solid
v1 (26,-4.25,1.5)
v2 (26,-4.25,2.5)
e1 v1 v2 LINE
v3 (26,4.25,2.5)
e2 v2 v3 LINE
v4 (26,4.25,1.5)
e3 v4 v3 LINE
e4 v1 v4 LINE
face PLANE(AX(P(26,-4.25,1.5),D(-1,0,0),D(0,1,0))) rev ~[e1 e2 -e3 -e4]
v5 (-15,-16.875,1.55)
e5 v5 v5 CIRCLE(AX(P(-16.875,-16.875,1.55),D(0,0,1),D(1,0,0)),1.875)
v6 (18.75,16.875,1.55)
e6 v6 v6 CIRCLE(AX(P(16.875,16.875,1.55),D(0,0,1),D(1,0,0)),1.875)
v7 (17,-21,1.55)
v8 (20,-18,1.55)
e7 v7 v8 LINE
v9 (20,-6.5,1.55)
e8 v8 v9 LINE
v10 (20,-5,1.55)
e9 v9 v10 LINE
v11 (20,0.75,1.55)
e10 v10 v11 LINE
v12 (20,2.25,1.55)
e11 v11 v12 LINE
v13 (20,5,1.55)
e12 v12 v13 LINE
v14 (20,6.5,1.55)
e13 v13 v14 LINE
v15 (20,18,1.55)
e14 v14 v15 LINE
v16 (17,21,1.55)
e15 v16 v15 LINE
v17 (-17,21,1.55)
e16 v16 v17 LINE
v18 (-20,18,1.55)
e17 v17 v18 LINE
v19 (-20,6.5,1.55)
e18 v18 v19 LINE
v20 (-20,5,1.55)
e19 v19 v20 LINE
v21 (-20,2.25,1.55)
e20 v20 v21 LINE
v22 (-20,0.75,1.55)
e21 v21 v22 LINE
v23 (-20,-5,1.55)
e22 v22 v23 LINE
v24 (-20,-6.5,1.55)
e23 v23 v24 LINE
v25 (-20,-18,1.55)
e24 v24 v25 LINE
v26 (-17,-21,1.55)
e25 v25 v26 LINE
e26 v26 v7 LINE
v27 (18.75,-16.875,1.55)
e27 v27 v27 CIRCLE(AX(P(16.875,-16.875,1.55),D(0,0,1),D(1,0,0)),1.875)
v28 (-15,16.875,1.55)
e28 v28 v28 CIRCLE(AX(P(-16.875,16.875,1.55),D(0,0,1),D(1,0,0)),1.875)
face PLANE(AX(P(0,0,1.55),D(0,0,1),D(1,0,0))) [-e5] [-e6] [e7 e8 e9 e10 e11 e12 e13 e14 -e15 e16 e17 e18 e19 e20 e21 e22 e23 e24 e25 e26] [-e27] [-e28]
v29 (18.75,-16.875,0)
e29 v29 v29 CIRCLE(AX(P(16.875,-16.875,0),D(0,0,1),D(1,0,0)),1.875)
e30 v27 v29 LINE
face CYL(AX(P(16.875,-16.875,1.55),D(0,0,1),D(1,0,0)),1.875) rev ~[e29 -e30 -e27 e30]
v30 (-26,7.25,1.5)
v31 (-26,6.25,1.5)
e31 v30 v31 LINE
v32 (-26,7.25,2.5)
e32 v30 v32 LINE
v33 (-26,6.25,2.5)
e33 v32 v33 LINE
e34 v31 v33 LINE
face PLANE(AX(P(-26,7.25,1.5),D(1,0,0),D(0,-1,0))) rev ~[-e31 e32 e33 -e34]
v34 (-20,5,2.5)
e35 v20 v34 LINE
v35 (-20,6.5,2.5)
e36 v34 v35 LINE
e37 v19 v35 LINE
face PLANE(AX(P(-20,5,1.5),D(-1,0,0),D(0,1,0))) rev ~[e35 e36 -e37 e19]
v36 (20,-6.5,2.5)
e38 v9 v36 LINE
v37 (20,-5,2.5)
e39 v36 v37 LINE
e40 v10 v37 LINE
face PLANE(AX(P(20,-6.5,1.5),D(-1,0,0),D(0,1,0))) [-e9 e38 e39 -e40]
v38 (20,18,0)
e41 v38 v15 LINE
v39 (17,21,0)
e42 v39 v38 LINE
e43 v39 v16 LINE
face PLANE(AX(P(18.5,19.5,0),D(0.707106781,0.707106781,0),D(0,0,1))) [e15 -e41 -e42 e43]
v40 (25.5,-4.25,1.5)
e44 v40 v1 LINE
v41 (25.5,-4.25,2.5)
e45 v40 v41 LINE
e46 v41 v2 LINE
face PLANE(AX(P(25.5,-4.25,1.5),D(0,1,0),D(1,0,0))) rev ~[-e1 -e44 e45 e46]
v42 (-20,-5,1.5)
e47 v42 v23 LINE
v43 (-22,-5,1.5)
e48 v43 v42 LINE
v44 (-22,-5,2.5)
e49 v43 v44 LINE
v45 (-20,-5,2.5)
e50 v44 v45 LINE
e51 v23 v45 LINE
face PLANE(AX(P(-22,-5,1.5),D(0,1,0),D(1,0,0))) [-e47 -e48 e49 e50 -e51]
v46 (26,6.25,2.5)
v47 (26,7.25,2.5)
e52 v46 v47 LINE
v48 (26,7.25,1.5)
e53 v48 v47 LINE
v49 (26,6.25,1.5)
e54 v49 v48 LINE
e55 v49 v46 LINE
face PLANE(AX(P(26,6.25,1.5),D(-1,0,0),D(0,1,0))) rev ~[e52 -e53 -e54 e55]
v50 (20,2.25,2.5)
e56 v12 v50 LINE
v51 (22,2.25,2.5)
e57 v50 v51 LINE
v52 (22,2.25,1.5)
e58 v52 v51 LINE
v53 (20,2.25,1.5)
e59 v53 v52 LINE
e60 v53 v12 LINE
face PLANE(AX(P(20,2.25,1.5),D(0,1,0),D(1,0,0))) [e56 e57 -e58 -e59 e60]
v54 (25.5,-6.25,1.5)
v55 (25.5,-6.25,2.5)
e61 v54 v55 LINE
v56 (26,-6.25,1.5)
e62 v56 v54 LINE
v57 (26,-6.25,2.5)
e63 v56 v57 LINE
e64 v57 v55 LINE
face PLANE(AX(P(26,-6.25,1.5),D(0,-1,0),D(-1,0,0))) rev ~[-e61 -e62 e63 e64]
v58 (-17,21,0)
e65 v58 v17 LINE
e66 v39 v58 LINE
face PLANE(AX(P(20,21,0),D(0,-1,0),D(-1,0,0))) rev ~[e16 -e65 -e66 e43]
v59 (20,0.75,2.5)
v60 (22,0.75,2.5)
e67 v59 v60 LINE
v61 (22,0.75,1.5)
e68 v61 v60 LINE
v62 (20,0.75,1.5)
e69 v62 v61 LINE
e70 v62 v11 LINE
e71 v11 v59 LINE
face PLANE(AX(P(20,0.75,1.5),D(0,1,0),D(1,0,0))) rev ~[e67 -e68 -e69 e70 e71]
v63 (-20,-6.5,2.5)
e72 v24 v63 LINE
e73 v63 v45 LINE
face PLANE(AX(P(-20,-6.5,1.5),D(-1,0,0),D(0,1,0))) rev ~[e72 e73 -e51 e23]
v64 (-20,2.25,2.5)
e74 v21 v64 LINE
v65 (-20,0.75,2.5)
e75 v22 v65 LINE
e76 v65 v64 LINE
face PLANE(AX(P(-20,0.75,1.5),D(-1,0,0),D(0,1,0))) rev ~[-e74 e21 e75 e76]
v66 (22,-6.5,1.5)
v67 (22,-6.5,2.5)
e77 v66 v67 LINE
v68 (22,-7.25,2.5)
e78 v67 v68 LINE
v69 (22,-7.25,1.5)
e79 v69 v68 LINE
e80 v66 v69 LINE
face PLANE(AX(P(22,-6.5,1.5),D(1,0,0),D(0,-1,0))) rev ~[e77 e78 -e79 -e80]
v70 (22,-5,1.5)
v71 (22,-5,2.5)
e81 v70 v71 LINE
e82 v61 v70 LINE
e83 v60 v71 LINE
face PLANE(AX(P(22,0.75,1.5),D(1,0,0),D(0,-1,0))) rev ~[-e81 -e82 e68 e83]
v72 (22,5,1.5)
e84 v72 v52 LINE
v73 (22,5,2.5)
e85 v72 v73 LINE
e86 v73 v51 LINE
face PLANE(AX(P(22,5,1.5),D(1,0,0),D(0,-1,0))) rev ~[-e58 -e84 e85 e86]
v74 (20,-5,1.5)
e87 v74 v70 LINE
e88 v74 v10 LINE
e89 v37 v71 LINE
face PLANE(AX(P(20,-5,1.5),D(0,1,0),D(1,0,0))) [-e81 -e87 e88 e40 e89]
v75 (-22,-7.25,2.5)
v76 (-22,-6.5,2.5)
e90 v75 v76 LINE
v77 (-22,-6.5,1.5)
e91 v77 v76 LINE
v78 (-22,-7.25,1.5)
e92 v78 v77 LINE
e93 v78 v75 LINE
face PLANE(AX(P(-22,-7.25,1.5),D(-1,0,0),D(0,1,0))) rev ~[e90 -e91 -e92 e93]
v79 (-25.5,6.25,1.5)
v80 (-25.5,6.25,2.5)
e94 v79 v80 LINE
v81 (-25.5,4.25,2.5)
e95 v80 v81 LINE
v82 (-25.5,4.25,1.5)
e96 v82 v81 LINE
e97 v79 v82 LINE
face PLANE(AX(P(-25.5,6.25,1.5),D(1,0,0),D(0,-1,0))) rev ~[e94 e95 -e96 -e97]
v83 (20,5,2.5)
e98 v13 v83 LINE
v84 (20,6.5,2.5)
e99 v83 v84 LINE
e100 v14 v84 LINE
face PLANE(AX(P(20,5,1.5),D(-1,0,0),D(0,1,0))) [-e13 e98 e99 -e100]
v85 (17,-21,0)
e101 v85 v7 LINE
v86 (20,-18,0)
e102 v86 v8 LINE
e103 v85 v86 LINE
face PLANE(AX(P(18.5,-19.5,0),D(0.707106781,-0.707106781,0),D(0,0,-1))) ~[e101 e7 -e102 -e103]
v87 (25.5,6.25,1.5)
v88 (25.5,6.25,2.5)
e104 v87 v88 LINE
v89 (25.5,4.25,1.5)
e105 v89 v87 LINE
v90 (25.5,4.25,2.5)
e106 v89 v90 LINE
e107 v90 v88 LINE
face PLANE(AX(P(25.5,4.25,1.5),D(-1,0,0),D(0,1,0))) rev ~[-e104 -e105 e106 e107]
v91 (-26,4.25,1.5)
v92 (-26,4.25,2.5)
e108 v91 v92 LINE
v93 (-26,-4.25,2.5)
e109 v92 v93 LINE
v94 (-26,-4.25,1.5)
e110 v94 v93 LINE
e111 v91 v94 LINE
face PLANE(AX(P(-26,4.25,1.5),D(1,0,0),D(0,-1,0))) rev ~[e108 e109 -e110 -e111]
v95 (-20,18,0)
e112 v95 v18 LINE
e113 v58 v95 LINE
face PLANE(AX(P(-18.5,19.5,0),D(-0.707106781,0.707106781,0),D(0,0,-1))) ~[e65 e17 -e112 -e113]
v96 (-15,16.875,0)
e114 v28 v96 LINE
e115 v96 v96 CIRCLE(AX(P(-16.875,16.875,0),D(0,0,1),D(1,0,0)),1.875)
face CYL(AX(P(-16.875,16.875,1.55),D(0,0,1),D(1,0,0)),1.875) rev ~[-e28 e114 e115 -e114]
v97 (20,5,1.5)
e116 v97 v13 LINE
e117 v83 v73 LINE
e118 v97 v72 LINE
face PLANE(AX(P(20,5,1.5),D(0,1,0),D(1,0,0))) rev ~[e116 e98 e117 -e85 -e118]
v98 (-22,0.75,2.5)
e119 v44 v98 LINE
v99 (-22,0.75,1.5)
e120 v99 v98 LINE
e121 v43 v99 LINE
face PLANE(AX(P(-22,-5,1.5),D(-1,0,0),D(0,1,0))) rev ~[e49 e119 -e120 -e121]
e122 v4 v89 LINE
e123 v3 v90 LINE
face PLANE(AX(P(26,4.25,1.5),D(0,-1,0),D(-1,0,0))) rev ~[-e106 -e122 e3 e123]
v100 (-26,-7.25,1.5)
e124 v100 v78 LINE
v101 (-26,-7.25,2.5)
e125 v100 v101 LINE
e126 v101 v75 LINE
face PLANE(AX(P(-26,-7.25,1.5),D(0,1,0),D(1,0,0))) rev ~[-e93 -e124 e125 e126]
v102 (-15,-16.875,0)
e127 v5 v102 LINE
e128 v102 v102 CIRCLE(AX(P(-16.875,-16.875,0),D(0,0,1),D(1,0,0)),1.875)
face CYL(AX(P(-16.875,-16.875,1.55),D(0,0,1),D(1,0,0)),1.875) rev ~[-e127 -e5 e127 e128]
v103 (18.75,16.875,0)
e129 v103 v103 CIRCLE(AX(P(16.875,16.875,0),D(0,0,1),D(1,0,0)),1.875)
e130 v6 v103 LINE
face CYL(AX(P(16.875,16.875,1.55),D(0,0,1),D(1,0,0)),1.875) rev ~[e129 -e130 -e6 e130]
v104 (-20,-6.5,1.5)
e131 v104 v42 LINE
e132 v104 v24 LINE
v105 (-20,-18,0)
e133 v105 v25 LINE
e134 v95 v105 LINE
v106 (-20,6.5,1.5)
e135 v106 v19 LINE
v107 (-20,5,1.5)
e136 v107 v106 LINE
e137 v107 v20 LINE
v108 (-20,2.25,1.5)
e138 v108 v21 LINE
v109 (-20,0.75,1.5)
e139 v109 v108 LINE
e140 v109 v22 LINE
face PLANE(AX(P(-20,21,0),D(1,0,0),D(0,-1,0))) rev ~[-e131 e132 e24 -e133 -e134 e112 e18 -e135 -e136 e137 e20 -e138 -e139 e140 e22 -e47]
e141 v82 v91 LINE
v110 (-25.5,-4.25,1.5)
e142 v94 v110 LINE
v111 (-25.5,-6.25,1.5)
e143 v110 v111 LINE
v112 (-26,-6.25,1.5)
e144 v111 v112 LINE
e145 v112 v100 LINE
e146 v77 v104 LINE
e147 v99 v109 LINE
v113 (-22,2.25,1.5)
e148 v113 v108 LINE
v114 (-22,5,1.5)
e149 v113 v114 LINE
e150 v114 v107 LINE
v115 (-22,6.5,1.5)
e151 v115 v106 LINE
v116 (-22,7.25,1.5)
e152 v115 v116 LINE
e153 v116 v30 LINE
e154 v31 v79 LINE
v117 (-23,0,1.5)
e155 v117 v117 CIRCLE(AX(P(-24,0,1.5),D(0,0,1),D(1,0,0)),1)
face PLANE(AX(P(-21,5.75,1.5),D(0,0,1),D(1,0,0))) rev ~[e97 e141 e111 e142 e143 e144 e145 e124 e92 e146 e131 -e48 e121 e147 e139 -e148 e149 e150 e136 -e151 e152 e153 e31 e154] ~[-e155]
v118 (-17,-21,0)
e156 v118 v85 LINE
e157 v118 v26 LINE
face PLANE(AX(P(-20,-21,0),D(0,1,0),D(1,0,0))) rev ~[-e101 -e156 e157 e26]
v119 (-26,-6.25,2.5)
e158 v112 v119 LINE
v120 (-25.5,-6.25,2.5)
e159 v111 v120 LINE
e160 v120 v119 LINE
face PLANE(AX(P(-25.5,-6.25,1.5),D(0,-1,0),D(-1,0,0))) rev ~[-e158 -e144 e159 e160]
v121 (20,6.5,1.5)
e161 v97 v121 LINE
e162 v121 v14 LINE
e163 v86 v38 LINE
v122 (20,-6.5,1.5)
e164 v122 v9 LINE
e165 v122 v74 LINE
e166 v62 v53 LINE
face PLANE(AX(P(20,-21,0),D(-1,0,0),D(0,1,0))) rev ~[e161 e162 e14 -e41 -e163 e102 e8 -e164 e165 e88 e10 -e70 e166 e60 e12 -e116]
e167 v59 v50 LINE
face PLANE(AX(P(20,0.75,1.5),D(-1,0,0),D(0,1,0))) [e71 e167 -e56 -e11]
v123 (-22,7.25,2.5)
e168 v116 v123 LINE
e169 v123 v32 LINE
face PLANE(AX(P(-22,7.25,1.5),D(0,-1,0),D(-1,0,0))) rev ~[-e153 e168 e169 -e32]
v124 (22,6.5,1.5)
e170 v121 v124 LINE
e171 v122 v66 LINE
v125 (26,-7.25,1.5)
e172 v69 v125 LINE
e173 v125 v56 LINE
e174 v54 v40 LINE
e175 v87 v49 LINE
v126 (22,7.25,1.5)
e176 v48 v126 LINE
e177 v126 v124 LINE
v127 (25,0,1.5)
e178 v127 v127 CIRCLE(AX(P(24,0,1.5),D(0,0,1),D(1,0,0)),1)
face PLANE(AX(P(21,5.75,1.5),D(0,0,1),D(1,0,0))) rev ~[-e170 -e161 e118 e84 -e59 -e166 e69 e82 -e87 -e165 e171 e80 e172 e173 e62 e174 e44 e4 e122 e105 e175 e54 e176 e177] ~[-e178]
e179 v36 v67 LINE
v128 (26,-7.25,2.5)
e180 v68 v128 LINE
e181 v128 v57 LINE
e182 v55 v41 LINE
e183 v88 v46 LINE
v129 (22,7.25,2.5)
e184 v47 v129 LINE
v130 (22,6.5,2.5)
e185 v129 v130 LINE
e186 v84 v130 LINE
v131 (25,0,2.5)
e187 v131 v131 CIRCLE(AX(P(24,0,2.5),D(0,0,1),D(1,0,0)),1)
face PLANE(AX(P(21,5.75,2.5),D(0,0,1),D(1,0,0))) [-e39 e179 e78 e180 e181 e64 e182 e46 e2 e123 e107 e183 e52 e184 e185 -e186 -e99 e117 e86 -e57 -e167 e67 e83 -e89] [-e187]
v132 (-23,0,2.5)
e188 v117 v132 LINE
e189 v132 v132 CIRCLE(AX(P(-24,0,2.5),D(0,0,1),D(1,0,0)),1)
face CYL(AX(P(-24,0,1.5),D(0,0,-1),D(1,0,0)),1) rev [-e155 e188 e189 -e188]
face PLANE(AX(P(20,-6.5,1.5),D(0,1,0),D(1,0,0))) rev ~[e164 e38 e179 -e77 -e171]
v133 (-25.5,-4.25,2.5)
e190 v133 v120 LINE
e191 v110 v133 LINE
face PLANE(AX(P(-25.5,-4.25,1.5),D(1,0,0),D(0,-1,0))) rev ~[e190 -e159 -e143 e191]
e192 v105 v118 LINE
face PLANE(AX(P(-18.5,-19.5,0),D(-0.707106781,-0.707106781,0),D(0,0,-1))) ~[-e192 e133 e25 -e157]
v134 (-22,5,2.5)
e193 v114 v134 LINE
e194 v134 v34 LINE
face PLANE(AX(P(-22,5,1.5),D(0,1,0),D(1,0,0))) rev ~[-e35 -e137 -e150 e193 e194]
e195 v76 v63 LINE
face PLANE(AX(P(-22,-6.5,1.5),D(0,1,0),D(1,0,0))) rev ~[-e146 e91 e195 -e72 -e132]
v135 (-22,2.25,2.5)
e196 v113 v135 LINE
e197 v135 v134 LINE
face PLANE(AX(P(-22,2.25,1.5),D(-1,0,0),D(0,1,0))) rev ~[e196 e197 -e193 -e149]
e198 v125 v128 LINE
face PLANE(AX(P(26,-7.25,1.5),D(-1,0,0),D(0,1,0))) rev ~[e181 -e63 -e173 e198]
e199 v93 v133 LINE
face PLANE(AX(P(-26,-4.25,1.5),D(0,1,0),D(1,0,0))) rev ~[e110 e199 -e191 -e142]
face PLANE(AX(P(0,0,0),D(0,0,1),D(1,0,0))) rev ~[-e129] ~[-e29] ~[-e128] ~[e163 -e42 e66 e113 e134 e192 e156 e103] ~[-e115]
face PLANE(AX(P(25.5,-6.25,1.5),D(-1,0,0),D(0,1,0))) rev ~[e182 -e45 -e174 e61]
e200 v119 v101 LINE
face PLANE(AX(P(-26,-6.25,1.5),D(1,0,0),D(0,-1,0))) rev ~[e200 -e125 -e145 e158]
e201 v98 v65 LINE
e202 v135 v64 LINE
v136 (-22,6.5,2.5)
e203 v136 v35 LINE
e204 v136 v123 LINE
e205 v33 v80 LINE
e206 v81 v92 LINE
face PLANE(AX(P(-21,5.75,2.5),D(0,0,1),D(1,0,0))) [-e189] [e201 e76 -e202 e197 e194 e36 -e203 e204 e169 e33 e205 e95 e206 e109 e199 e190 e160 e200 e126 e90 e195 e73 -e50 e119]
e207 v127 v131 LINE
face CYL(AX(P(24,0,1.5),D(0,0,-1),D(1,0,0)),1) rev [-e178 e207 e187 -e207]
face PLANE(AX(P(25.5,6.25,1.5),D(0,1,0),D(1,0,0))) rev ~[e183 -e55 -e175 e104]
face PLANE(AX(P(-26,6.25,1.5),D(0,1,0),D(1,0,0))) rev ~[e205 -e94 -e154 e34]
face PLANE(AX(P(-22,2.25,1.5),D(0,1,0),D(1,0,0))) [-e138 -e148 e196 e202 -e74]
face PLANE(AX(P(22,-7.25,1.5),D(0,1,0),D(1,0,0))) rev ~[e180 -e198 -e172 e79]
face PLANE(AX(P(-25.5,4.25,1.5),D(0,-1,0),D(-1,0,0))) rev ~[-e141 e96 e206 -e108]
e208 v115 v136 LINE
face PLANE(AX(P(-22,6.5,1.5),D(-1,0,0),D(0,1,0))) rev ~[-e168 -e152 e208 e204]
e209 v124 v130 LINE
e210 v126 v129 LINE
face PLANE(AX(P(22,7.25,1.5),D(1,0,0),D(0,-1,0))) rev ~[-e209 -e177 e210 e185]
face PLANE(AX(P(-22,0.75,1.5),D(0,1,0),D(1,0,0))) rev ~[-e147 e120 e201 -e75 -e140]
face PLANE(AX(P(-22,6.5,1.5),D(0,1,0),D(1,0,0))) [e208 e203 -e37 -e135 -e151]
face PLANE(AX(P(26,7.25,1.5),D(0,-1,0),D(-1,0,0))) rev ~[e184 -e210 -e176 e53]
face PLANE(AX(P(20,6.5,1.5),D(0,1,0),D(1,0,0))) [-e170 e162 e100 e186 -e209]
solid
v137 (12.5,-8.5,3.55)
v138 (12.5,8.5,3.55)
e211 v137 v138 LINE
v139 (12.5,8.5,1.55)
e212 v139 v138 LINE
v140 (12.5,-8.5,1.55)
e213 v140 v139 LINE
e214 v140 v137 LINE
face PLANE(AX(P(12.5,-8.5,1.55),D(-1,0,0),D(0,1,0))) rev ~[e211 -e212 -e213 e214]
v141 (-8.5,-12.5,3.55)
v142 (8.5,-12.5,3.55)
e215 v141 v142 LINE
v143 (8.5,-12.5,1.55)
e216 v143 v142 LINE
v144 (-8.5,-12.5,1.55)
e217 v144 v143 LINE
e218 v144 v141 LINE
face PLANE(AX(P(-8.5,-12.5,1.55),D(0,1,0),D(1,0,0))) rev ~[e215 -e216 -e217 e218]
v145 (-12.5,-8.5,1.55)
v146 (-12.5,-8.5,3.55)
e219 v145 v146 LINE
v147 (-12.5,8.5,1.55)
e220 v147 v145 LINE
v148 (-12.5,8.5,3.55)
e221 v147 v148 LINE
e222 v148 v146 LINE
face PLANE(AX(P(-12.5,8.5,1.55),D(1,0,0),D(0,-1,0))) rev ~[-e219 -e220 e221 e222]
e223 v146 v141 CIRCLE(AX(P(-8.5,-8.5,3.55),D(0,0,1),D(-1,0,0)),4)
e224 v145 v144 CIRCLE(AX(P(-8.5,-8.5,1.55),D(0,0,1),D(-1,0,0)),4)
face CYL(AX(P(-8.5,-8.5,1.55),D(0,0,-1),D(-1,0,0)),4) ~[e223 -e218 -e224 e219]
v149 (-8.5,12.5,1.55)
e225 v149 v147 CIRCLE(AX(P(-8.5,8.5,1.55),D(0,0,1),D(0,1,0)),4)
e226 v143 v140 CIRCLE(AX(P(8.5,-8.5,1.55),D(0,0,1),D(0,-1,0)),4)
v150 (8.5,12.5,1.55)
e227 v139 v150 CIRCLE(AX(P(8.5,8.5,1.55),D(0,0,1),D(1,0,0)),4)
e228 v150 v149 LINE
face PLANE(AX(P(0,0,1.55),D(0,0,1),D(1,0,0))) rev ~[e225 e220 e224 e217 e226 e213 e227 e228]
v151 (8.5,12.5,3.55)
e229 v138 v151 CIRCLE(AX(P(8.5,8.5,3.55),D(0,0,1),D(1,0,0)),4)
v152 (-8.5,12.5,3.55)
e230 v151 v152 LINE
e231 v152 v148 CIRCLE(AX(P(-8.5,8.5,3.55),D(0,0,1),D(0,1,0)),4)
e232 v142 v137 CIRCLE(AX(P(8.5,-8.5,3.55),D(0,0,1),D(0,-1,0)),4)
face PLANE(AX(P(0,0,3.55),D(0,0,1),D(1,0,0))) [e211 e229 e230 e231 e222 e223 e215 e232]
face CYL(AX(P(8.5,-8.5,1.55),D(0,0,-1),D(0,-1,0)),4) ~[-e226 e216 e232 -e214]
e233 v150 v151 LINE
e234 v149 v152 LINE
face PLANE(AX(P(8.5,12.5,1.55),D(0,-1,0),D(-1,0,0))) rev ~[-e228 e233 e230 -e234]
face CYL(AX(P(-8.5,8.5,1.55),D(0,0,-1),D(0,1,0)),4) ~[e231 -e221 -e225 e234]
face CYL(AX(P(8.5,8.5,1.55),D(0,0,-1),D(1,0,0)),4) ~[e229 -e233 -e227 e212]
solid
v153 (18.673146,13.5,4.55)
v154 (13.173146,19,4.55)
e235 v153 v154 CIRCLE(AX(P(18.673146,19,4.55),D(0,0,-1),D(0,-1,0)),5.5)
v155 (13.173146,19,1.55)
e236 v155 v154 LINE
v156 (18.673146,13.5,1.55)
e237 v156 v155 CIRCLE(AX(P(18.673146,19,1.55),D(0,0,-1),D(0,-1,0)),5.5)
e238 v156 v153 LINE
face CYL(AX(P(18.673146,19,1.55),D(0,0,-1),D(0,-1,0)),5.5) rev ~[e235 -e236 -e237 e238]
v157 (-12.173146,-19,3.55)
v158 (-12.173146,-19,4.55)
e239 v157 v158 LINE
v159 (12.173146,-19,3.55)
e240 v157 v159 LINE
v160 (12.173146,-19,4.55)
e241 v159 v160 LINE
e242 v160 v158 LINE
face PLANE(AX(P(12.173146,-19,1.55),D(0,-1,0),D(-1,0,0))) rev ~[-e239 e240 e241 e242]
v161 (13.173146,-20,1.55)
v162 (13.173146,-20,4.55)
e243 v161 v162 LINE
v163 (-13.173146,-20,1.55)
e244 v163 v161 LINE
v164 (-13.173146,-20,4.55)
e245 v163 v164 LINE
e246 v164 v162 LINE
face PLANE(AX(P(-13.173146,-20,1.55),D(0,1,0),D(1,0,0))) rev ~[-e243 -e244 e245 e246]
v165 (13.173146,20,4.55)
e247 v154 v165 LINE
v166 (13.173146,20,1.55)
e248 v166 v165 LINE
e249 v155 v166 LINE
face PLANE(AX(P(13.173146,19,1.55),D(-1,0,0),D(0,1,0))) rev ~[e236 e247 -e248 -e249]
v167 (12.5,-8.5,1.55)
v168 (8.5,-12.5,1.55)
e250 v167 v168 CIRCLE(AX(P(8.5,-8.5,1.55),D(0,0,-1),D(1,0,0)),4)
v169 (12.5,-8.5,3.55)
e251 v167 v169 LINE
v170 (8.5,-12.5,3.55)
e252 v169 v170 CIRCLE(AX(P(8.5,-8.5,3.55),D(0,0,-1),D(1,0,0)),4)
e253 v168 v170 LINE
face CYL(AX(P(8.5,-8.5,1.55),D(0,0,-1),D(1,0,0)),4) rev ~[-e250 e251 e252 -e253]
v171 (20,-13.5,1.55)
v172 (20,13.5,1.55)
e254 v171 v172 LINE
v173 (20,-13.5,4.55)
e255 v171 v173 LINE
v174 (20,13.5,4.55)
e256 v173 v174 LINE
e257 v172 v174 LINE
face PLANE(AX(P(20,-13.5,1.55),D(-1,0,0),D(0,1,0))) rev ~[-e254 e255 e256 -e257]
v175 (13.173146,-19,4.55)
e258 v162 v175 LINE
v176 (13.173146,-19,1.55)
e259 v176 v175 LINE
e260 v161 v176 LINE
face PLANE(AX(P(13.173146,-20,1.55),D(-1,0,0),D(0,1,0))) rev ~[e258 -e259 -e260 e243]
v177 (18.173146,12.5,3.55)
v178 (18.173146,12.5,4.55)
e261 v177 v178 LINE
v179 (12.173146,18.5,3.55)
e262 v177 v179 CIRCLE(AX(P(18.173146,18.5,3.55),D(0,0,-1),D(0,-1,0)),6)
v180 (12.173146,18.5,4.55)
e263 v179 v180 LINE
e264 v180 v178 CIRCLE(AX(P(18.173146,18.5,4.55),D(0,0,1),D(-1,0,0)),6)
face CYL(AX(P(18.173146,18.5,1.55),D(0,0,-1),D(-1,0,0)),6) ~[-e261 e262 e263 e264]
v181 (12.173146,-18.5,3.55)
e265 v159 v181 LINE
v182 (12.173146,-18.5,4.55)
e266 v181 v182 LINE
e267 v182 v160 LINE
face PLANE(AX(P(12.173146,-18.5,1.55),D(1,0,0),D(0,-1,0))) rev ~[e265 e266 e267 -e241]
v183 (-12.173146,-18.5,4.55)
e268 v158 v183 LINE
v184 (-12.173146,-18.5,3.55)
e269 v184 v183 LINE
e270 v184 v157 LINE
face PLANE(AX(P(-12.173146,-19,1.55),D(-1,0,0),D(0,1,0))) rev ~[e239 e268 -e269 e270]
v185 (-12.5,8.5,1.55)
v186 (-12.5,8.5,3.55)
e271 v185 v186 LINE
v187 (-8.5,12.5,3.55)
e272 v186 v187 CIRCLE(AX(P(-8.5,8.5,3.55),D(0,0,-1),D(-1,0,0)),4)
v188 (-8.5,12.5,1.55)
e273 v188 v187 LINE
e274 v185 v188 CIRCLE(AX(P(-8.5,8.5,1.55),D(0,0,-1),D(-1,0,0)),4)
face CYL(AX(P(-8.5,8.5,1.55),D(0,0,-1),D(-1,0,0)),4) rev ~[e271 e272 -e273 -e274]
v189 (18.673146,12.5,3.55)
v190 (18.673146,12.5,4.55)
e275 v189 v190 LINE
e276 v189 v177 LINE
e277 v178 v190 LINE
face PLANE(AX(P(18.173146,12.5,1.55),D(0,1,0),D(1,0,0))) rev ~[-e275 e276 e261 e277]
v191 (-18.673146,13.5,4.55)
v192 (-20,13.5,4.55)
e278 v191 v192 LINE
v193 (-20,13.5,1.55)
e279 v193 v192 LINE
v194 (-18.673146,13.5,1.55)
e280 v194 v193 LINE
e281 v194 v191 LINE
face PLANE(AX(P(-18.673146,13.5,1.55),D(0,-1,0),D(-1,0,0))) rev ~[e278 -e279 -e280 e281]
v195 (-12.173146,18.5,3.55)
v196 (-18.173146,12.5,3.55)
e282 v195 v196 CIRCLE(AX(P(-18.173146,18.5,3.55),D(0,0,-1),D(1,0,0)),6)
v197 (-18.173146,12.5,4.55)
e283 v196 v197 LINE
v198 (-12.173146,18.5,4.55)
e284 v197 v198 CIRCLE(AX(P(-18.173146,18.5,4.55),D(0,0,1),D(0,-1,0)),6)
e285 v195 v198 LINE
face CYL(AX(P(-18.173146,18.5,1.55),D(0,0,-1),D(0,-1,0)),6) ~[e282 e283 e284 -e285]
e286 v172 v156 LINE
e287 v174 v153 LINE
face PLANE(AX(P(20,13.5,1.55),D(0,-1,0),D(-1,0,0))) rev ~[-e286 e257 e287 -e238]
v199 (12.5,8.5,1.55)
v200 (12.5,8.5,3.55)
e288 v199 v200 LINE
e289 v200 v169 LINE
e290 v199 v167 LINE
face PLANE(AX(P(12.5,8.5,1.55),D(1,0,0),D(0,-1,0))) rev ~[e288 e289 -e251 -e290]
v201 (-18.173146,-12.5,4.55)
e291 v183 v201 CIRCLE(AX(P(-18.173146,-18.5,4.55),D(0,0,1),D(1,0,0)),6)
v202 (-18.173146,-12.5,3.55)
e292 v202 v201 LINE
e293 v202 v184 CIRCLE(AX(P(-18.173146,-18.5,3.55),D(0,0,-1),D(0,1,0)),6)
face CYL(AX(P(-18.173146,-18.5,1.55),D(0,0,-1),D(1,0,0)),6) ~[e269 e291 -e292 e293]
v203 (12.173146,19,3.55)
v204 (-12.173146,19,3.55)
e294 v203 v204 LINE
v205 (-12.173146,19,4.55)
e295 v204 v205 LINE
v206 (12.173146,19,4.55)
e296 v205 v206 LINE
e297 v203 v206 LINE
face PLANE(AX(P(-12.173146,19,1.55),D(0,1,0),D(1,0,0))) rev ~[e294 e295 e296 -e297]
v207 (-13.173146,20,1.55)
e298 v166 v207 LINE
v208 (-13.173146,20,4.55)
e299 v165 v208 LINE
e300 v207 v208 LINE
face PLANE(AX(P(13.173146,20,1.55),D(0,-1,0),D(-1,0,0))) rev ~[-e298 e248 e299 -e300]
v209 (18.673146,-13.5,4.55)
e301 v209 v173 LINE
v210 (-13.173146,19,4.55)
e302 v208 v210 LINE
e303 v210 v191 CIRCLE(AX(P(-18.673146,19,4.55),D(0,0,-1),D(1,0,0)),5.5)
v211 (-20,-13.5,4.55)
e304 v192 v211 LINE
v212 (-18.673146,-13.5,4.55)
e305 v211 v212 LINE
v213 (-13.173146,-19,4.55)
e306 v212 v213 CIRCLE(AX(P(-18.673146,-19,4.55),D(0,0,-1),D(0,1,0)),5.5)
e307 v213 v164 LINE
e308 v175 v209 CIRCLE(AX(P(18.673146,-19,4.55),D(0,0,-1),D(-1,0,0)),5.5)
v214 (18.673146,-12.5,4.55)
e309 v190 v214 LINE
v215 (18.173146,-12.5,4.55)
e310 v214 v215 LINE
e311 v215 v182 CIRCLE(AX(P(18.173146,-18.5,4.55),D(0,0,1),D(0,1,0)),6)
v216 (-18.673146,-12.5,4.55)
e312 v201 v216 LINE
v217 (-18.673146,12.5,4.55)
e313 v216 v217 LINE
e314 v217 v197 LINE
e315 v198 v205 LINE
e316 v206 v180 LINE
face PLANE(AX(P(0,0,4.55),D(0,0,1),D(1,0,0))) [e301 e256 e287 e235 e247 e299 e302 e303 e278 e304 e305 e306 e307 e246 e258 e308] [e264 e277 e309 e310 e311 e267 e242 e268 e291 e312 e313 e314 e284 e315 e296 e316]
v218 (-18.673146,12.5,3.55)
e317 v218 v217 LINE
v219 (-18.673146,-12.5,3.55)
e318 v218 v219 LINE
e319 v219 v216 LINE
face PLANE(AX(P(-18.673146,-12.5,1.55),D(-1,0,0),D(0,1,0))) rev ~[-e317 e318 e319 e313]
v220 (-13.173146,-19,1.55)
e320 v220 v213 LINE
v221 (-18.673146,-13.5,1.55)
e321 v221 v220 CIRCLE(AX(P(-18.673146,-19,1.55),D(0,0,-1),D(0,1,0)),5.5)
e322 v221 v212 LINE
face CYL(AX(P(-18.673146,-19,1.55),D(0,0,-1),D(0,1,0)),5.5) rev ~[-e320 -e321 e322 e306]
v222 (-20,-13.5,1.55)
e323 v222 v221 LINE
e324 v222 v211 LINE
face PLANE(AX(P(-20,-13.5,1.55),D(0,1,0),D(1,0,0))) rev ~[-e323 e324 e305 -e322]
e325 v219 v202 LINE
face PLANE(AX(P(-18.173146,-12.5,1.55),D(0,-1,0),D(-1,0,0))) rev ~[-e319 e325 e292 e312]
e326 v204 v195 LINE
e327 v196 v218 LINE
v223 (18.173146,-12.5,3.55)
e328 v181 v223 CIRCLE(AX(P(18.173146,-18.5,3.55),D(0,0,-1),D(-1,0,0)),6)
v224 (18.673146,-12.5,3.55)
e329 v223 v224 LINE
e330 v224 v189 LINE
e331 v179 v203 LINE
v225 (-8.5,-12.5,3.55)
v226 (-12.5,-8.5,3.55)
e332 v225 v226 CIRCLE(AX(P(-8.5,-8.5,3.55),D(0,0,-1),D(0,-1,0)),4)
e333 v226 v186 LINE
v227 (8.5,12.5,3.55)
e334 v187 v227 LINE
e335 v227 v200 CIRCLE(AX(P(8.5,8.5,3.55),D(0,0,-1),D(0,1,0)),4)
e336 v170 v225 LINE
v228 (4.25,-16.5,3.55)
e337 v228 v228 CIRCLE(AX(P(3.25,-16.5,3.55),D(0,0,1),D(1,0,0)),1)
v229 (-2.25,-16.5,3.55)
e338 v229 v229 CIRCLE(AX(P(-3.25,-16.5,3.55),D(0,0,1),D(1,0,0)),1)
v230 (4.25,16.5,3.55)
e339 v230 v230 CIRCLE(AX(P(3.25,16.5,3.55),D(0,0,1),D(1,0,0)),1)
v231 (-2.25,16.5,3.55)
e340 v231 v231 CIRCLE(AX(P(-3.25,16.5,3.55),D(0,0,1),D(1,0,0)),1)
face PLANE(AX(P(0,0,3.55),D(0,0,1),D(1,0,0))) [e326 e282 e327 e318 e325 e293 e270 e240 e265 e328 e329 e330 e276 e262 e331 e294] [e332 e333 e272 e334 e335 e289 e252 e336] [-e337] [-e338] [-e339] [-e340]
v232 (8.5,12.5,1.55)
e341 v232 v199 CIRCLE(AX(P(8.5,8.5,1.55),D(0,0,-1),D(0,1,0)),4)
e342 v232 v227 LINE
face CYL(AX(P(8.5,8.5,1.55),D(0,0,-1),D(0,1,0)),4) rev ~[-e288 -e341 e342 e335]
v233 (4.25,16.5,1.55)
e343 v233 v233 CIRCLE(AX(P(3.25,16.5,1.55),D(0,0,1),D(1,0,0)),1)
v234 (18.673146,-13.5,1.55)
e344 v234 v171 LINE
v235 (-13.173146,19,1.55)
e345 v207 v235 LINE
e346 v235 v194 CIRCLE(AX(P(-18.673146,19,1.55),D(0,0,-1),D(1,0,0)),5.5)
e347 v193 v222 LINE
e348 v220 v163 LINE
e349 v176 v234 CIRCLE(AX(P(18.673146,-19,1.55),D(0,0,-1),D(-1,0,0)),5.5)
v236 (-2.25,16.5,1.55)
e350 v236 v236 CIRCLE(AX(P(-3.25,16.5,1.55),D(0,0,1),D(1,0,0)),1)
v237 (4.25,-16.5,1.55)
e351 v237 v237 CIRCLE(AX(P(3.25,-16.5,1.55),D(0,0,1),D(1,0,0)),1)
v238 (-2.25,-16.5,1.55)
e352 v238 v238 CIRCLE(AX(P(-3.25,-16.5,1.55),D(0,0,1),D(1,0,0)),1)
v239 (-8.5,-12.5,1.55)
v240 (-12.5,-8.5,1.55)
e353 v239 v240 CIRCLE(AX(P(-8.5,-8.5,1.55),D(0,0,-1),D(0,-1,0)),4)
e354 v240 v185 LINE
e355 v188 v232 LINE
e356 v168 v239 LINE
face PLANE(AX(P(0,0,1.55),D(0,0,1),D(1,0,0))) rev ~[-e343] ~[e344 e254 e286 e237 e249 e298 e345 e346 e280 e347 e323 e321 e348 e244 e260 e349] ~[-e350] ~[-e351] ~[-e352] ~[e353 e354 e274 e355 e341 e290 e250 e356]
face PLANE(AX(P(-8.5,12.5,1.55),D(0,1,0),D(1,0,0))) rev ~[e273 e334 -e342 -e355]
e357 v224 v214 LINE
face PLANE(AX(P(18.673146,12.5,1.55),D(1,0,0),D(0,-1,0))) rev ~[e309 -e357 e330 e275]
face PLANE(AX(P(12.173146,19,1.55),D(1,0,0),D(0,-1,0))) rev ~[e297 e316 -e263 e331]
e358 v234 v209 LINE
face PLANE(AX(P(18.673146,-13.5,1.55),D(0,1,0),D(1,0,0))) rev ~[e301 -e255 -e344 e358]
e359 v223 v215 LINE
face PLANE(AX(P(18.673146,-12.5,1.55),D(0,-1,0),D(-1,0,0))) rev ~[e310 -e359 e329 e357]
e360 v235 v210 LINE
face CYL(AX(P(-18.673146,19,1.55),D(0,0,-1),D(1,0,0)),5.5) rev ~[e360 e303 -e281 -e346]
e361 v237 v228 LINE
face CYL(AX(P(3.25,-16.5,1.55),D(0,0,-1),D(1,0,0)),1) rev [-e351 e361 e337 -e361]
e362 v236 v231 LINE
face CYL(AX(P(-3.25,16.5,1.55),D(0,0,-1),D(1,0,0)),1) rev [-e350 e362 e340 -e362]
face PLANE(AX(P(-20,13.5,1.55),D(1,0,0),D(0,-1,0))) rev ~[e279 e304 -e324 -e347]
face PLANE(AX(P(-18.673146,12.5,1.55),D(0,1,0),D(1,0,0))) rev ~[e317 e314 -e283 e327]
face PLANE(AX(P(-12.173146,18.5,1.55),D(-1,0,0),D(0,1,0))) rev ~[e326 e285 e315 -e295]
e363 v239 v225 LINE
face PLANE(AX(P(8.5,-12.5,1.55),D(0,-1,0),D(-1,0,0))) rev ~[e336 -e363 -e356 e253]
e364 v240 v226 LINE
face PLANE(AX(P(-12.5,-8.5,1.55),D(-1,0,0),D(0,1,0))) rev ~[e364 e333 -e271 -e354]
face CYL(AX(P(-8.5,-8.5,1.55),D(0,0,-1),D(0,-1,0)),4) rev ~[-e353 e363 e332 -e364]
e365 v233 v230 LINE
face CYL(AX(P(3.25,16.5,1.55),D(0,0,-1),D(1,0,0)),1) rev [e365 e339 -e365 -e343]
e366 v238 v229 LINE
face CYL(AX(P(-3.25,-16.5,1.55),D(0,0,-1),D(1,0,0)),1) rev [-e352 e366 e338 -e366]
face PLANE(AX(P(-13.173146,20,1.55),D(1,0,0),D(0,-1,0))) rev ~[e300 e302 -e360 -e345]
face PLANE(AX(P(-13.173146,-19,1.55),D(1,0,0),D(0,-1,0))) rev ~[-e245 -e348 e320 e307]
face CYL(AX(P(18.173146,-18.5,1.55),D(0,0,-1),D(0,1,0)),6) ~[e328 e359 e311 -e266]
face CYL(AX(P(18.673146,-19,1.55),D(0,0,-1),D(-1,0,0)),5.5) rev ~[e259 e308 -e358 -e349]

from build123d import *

# Parameters (mm, degrees)
F1_DEPTH = 1.55
F3_SIZE  = 3
F4_R     = 1.875
F5_DEPTH = 4
F6_DEPTH = 3
F2_R     = 1
F2_W     = 1.5
F2_H     = 0.5
F2_W_2   = 0.5
F2_H_2   = 1.5219762474
F2_H_3   = 1.4780237526
F7_DEPTH = 2
F8_DEPTH = 2
F9_START = 1.5
F0_W     = 2
F0_H     = 1.5
F0_R     = 1
F9_DEPTH = 1


with BuildPart() as f1:
    # F0 (on Top) → F1 (new body)
    with BuildSketch(Plane.XY):
        Polygon((20, 21), (-20, 21), (-20, 6.5), (-20, 5), (-20, 2.25), (-20, 0.75), (-20, -5), (-20, -6.5), (-20, -21), (20, -21), (20, -6.5), (20, -5), (20, 0.75), (20, 2.25), (20, 5), (20, 6.5), align=None)
    extrude(amount=F1_DEPTH)

    # F3
    f3_edges = [f1.edges().sort_by_distance(p)[0] for p in [
        (-20, 21, 0.775),
        (20, 21, 0.775),
        (20, -21, 0.775),
        (-20, -21, 0.775),
    ]]
    chamfer(f3_edges, length=F3_SIZE)

    # F4 (on face) → F5 (cut)
    with BuildSketch(Plane.XY.offset(1.55)):
        with Locations((-16.875, -16.875)):
            Circle(F4_R)
        with Locations((16.875, -16.875)):
            Circle(F4_R)
        with Locations((16.875, 16.875)):
            Circle(F4_R)
        with Locations((-16.875, 16.875)):
            Circle(F4_R)
    extrude(amount=-F5_DEPTH, mode=Mode.SUBTRACT)

    # F0 (on Top) → F9 (join)
    with BuildSketch(Plane.XY.offset(F9_START)):
        with Locations((21, 5.75)):
            Rectangle(F0_W, F0_H)
        with Locations((21, 1.5)):
            Rectangle(F0_W, F0_H)
        with Locations((-21, 5.75)):
            Rectangle(F0_W, F0_H)
        with Locations((-21, 1.5)):
            Rectangle(F0_W, F0_H)
        with Locations((-21, -5.75)):
            Rectangle(F0_W, F0_H)
        Polygon((-22, 5), (-22, 6.5), (-22, 7.25), (-26, 7.25), (-26, 6.25), (-25.5, 6.25), (-25.5, 4.25), (-26, 4.25), (-26, -4.25), (-25.5, -4.25), (-25.5, -6.25), (-26, -6.25), (-26, -7.25), (-22, -7.25), (-22, -6.5), (-22, -5), (-22, 0.75), (-22, 2.25), align=None)
        with Locations((-24, 0)):
            Circle(F0_R, mode=Mode.SUBTRACT)
        with Locations((21, -5.75)):
            Rectangle(F0_W, F0_H)
        Polygon((22, 7.25), (22, 6.5), (22, 5), (22, 2.25), (22, 0.75), (22, -5), (22, -6.5), (22, -7.25), (26, -7.25), (26, -6.25), (25.5, -6.25), (25.5, -4.25), (26, -4.25), (26, 4.25), (25.5, 4.25), (25.5, 6.25), (26, 6.25), (26, 7.25), align=None)
        with Locations((24, 0)):
            Circle(F0_R, mode=Mode.SUBTRACT)
    extrude(amount=F9_DEPTH)


with BuildPart() as f6:
    # F2 (on face) → F6 (new body)
    with BuildSketch(Plane.XY.offset(1.55)):
        with BuildLine():
            Line((13.1731458455, 20), (-13.1731458455, 20))
            Line((-13.1731458455, 20), (-13.1731458455, 19))
            ThreePointArc((-13.1731458455, 19), (-14.784058549, 15.1109127035), (-18.6731458455, 13.5))
            Line((-18.6731458455, 13.5), (-20, 13.5))
            Line((-20, 13.5), (-20, -13.5))
            Line((-20, -13.5), (-18.6731458455, -13.5))
            ThreePointArc((-18.6731458455, -13.5), (-14.784058549, -15.1109127035), (-13.1731458455, -19))
            Line((-13.1731458455, -19), (-13.1731458455, -20))
            Line((-13.1731458455, -20), (13.1731458455, -20))
            Line((13.1731458455, -20), (13.1731458455, -19))
            ThreePointArc((13.1731458455, -19), (14.784058549, -15.1109127035), (18.6731458455, -13.5))
            Line((18.6731458455, -13.5), (20, -13.5))
            Line((20, -13.5), (20, 13.5))
            Line((20, 13.5), (18.6731458455, 13.5))
            ThreePointArc((18.6731458455, 13.5), (14.784058549, 15.1109127035), (13.1731458455, 19))
            Line((13.1731458455, 19), (13.1731458455, 20))
        make_face()
        with BuildLine():
            Line((-12.1731458455, 18.5), (-12.1731458455, 19))
            Line((-12.1731458455, 19), (12.1731458455, 19))
            Line((12.1731458455, 19), (12.1731458455, 18.5))
            ThreePointArc((12.1731458455, 18.5), (13.9305051584, 14.2573593129), (18.1731458455, 12.5))
            Line((18.1731458455, 12.5), (18.6731458455, 12.5))
            Line((18.6731458455, 12.5), (18.6731458455, -12.5))
            Line((18.6731458455, -12.5), (18.1731458455, -12.5))
            ThreePointArc((18.1731458455, -12.5), (13.9305051584, -14.2573593129), (12.1731458455, -18.5))
            Line((12.1731458455, -18.5), (12.1731458455, -19))
            Line((12.1731458455, -19), (-12.1731458455, -19))
            Line((-12.1731458455, -19), (-12.1731458455, -18.5))
            ThreePointArc((-12.1731458455, -18.5), (-13.9305051584, -14.2573593129), (-18.1731458455, -12.5))
            Line((-18.1731458455, -12.5), (-18.6731458455, -12.5))
            Line((-18.6731458455, -12.5), (-18.6731458455, 12.5))
            Line((-18.6731458455, 12.5), (-18.1731458455, 12.5))
            ThreePointArc((-18.1731458455, 12.5), (-13.9305051584, 14.2573593129), (-12.1731458455, 18.5))
        make_face(mode=Mode.SUBTRACT)
    extrude(amount=F6_DEPTH)

    # F2 (on face) → F7 (join)
    with BuildSketch(Plane.XY.offset(1.55)):
        with BuildLine():
            Line((12.1731458455, 19), (-12.1731458455, 19))
            Line((-12.1731458455, 19), (-12.1731458455, 18.5))
            ThreePointArc((-12.1731458455, 18.5), (-13.9305051584, 14.2573593129), (-18.1731458455, 12.5))
            Line((-18.1731458455, 12.5), (-18.6731458455, 12.5))
            Line((-18.6731458455, 12.5), (-18.6731458455, -12.5))
            Line((-18.6731458455, -12.5), (-18.1731458455, -12.5))
            ThreePointArc((-18.1731458455, -12.5), (-13.9305051584, -14.2573593129), (-12.1731458455, -18.5))
            Line((-12.1731458455, -18.5), (-12.1731458455, -19))
            Line((-12.1731458455, -19), (12.1731458455, -19))
            Line((12.1731458455, -19), (12.1731458455, -18.5))
            ThreePointArc((12.1731458455, -18.5), (13.9305051584, -14.2573593129), (18.1731458455, -12.5))
            Line((18.1731458455, -12.5), (18.6731458455, -12.5))
            Line((18.6731458455, -12.5), (18.6731458455, 12.5))
            Line((18.6731458455, 12.5), (18.1731458455, 12.5))
            ThreePointArc((18.1731458455, 12.5), (13.9305051584, 14.2573593129), (12.1731458455, 18.5))
            Line((12.1731458455, 18.5), (12.1731458455, 19))
        make_face()
        Polygon((-9.1731458455, -16.4780237526), (-9.1731458455, -18), (-9.6731458455, -18), (-9.6731458455, -16.4780237526), (-11.1731458455, -16.4780237526), (-11.1731458455, -15.9780237526), (-9.6731458455, -15.9780237526), (-9.6731458455, -14.5), (-9.1731458455, -14.5), (-9.1731458455, -15.9780237526), (-7.6731458455, -15.9780237526), (-7.6731458455, -16.4780237526), align=None, mode=Mode.SUBTRACT)
        with Locations((-3.25, -16.5)):
            Circle(F2_R, mode=Mode.SUBTRACT)
        with Locations((3.25, -16.5)):
            Circle(F2_R, mode=Mode.SUBTRACT)
        with Locations((-3.25, 16.5)):
            Circle(F2_R, mode=Mode.SUBTRACT)
        with BuildLine():
            ThreePointArc((-12.5, 8.5), (-11.3284271247, 11.3284271247), (-8.5, 12.5))
            Line((-8.5, 12.5), (8.5, 12.5))
            ThreePointArc((8.5, 12.5), (11.3284271247, 11.3284271247), (12.5, 8.5))
            Line((12.5, 8.5), (12.5, -8.5))
            ThreePointArc((12.5, -8.5), (11.3284271247, -11.3284271247), (8.5, -12.5))
            Line((8.5, -12.5), (-8.5, -12.5))
            ThreePointArc((-8.5, -12.5), (-11.3284271247, -11.3284271247), (-12.5, -8.5))
            Line((-12.5, -8.5), (-12.5, 8.5))
        make_face(mode=Mode.SUBTRACT)
        with Locations((3.25, 16.5)):
            Circle(F2_R, mode=Mode.SUBTRACT)
        with Locations((-8.4231458455, -16.2280237526)):
            Rectangle(F2_W, F2_H)
        with Locations((-10.4231458455, -16.2280237526)):
            Rectangle(F2_W, F2_H)
        with Locations((-9.4231458455, -17.2390118763)):
            Rectangle(F2_W_2, F2_H_2)
        with Locations((-9.4231458455, -15.2390118763)):
            Rectangle(F2_W_2, F2_H_3)
        with Locations((-9.4231458455, -16.2280237526)):
            Rectangle(F2_W_2, F2_H)
    extrude(amount=F7_DEPTH)


with BuildPart() as f8:
    # F2 (on face) → F8 (new body)
    with BuildSketch(Plane.XY.offset(1.55)):
        with BuildLine():
            Line((8.5, 12.5), (-8.5, 12.5))
            ThreePointArc((-8.5, 12.5), (-11.3284271247, 11.3284271247), (-12.5, 8.5))
            Line((-12.5, 8.5), (-12.5, -8.5))
            ThreePointArc((-12.5, -8.5), (-11.3284271247, -11.3284271247), (-8.5, -12.5))
            Line((-8.5, -12.5), (8.5, -12.5))
            ThreePointArc((8.5, -12.5), (11.3284271247, -11.3284271247), (12.5, -8.5))
            Line((12.5, -8.5), (12.5, 8.5))
            ThreePointArc((12.5, 8.5), (11.3284271247, 11.3284271247), (8.5, 12.5))
        make_face()
    extrude(amount=F8_DEPTH)


solid = Compound([f1.part, f6.part, f8.part])
